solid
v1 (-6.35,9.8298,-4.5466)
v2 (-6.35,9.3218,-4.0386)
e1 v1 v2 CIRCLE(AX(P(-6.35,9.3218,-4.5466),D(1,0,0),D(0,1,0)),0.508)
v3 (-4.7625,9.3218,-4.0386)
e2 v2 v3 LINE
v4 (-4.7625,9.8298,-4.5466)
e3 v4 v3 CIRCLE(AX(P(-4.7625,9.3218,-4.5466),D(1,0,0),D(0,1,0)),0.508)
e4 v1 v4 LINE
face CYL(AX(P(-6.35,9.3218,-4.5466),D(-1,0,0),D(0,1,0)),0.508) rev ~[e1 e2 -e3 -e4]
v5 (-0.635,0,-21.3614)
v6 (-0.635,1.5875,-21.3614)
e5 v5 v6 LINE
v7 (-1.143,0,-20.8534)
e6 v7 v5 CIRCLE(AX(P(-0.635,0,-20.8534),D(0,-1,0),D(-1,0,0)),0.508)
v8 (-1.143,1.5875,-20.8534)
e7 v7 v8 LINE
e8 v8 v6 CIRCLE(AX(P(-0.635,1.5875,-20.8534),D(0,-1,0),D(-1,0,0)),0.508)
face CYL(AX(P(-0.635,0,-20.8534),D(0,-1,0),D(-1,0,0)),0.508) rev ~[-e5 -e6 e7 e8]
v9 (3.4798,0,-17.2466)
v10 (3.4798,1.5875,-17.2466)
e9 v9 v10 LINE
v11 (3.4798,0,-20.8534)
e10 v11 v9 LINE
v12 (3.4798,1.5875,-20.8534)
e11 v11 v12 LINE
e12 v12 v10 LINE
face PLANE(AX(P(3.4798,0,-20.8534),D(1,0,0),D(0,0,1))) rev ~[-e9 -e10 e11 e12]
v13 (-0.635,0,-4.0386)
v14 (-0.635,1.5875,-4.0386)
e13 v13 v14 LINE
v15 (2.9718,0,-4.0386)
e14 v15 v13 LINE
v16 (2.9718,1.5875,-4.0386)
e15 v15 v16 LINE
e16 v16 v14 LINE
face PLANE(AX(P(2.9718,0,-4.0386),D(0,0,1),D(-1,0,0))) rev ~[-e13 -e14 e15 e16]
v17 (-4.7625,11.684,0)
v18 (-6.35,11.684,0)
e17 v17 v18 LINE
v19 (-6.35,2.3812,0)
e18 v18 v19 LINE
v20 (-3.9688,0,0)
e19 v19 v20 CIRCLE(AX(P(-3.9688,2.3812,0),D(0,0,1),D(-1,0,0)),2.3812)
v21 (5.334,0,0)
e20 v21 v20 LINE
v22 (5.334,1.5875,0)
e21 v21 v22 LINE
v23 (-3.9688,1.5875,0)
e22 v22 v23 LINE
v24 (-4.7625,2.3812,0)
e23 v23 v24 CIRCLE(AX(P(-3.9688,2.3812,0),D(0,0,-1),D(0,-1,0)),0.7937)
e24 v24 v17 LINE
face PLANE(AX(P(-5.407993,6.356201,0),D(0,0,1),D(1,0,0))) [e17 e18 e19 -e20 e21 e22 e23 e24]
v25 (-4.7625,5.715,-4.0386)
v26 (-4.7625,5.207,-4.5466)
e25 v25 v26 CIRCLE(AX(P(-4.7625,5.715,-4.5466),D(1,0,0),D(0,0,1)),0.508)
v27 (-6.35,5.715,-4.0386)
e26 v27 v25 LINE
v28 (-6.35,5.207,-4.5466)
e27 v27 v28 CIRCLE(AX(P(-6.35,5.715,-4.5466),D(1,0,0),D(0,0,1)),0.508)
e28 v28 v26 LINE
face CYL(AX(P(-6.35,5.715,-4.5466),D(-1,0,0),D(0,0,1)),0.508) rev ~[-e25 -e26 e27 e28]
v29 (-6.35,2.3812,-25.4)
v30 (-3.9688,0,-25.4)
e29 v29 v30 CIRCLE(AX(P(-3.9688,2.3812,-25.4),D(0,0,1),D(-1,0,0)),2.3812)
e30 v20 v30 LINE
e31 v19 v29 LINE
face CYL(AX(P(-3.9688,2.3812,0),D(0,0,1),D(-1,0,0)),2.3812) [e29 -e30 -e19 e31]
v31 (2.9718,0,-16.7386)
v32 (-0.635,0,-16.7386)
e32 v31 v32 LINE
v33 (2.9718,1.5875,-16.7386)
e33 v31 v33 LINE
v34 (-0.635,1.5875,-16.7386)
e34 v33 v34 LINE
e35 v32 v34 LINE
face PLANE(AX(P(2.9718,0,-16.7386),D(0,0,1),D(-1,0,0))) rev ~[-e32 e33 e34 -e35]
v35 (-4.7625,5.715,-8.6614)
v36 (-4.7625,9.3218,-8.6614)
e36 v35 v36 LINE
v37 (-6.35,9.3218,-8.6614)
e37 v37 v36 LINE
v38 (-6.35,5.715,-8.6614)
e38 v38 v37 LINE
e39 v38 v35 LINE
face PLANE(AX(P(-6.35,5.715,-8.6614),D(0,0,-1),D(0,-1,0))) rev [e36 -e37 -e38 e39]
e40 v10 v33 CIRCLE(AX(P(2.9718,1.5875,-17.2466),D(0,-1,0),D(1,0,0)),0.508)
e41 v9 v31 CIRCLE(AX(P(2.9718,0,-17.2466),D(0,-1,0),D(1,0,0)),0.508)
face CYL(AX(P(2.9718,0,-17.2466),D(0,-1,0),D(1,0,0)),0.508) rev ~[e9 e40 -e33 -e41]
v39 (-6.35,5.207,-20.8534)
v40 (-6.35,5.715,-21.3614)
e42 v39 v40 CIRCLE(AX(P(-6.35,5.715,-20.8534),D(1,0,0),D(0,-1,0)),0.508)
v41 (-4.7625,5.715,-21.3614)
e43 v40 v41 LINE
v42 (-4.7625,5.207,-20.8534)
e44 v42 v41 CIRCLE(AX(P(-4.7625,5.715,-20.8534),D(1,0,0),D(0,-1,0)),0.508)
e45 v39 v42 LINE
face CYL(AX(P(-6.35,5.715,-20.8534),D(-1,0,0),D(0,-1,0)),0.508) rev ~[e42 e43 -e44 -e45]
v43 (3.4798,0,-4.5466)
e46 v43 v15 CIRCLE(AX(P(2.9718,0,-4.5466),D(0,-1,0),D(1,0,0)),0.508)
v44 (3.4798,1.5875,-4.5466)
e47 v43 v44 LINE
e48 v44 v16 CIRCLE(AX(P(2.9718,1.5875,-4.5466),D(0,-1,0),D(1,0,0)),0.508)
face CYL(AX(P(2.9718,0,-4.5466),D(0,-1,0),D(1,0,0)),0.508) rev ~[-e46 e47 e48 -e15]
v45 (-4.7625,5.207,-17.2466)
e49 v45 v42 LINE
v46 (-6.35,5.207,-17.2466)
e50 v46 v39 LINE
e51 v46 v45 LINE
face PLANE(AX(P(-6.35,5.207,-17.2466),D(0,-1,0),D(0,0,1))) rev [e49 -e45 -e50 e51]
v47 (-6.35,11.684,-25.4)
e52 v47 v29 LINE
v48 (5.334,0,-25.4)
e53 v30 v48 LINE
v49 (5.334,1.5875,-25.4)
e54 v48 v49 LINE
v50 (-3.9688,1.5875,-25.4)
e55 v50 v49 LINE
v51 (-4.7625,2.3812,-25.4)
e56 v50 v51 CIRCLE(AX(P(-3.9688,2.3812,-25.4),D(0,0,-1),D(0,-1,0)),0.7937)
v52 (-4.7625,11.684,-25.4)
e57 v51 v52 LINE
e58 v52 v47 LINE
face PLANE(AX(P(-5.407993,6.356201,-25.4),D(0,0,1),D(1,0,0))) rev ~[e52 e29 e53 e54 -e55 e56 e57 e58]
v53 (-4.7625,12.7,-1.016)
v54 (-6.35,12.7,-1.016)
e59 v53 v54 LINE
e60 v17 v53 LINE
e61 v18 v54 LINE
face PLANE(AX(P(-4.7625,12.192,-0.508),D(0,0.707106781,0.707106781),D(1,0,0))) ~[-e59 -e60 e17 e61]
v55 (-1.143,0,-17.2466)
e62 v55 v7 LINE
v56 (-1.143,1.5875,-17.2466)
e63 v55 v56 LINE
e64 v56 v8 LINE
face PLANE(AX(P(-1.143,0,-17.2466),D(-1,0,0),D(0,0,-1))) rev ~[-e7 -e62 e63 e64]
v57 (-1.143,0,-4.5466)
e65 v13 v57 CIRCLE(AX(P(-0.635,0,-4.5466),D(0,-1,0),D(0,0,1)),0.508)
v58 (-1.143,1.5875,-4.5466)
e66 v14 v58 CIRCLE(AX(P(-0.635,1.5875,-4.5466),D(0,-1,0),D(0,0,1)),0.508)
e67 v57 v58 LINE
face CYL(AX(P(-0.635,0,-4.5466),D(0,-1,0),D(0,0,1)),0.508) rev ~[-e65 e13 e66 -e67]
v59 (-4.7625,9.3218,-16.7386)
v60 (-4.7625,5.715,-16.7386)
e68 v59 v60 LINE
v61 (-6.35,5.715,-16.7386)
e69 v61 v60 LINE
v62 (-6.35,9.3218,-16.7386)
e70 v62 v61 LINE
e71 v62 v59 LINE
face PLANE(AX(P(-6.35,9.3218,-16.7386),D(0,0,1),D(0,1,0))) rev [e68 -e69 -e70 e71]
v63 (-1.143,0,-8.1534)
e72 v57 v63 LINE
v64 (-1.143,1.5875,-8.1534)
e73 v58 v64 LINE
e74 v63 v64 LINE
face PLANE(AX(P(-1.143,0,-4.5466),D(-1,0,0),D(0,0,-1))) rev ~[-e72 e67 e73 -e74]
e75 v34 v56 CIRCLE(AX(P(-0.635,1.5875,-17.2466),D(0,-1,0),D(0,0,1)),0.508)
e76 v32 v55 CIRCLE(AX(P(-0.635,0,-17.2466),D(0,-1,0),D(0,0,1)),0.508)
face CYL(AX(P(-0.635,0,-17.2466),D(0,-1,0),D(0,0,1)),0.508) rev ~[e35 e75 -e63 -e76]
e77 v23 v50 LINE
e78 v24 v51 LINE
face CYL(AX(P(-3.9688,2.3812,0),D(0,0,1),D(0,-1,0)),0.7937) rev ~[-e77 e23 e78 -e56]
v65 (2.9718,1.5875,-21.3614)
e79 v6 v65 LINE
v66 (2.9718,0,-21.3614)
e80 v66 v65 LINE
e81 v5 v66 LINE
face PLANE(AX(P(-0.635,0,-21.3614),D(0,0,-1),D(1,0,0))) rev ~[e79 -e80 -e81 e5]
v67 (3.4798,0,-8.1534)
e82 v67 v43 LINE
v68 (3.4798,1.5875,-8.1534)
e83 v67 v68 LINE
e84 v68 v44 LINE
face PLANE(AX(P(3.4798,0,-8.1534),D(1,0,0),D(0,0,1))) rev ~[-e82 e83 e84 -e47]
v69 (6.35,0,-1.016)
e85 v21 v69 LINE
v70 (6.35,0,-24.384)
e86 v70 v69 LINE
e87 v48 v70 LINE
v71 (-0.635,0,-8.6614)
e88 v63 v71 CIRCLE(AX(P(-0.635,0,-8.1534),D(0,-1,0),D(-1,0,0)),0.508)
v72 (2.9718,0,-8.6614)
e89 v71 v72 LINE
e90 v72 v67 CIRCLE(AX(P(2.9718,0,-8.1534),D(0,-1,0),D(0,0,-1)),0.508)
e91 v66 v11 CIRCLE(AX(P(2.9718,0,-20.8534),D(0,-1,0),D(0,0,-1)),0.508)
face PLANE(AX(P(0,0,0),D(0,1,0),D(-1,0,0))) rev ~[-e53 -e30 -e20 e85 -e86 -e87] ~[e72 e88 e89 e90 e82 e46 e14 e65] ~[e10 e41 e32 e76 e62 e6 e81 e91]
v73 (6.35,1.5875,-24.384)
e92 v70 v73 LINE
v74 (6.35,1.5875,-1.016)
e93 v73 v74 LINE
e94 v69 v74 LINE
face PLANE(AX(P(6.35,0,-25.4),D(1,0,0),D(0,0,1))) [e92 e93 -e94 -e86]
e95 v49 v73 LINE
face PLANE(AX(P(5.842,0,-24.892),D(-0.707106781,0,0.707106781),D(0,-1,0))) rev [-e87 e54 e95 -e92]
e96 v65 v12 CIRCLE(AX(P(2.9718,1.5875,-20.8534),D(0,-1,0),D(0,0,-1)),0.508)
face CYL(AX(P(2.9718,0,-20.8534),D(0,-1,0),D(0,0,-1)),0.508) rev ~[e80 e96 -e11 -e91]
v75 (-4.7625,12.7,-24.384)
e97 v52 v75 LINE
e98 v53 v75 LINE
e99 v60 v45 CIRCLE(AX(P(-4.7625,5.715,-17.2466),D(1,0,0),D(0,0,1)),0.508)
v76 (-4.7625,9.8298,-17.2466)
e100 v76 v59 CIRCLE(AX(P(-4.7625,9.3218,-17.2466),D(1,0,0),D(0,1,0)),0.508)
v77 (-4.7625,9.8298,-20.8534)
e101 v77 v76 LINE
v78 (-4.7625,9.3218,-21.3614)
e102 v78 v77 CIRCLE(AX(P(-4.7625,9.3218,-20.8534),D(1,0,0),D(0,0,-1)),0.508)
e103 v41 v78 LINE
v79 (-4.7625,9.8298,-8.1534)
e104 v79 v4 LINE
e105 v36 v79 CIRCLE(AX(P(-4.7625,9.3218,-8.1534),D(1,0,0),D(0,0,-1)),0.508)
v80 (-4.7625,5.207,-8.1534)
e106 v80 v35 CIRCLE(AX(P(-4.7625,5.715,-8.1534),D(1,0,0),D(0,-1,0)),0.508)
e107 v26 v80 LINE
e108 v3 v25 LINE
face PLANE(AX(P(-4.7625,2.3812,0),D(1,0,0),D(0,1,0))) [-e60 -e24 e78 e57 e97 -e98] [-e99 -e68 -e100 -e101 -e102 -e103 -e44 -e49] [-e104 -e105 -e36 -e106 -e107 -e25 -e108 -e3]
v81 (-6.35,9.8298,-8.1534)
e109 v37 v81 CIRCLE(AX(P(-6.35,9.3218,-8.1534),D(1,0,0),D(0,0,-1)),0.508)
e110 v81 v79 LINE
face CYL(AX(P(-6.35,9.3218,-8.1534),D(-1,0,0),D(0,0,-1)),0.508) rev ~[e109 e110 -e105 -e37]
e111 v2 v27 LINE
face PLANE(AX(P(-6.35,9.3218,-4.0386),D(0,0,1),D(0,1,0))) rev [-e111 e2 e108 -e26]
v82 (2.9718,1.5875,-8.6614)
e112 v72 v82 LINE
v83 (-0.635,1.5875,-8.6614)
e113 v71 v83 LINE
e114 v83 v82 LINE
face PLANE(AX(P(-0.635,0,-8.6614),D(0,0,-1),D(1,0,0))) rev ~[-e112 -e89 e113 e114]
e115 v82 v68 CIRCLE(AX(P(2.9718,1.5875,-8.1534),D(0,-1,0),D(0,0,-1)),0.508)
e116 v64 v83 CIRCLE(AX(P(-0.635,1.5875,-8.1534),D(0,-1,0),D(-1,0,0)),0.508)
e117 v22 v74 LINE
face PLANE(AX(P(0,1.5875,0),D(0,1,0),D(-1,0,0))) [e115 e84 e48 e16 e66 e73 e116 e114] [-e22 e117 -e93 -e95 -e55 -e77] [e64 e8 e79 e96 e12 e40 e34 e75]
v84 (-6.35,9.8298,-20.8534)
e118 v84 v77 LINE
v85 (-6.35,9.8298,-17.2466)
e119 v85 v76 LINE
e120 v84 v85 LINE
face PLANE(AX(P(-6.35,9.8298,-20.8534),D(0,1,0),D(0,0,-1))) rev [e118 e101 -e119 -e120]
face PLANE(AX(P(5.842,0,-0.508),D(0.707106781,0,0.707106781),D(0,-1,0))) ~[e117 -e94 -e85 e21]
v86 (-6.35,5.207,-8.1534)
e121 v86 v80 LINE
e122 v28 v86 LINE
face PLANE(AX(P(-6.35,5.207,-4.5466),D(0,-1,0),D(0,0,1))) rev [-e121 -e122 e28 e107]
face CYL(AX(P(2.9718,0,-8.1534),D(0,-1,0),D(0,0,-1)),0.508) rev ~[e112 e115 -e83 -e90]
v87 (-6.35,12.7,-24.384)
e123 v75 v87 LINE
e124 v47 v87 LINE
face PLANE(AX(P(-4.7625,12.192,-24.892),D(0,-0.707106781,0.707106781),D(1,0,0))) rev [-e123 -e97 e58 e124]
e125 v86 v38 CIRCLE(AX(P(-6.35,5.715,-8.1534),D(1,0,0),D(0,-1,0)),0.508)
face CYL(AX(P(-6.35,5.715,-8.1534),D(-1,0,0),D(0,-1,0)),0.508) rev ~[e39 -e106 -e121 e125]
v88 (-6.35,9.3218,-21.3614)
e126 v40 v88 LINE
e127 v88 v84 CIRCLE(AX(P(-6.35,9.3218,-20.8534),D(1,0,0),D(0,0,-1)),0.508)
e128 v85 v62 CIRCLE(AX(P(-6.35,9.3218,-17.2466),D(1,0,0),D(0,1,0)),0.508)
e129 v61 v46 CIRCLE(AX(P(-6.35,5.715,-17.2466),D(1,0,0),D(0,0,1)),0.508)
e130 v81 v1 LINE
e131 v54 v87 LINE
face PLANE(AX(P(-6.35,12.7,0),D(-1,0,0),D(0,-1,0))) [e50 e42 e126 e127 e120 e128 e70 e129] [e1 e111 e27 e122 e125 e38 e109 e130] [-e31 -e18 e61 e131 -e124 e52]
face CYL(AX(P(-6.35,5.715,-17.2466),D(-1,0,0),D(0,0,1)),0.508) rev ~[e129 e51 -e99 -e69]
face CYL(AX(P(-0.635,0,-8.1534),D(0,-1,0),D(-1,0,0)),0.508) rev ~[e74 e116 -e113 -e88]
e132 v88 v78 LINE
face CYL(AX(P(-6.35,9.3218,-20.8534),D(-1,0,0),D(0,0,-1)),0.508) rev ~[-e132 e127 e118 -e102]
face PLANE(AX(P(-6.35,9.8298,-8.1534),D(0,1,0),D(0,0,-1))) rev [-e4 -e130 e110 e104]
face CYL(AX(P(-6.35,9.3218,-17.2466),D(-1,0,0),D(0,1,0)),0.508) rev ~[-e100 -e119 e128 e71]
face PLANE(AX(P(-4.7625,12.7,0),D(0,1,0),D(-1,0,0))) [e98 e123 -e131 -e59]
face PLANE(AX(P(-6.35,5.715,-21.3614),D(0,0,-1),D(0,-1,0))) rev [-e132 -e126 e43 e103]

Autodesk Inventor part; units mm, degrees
ref_plane "YZ Plane" through (0, 0, 0) normal (1, 0, 0) x (0, 1, 0)
ref_plane "XZ Plane" through (0, 0, 0) normal (0, 1, 0) x (-1, 0, 0)
sketch "Sketch1" plane through (0, 0, 0) normal (0, 1, 0) x (-1, 0, 0)
  line L0 (-6.35, 0) -> (6.35, 0)
  line L1 (6.35, 0) -> (6.35, -25.4)
  line L2 (6.35, -25.4) -> (-6.35, -25.4)
  line L3 (-6.35, -25.4) -> (-6.35, 0)
  line L4 (6.35, 0) -> (-6.35, -25.4) construction
  point P0 (0, 0)
  point P1 (0, 0)
  dimension "d0" = 12.7
  dimension "d1" = 25.4
extrude "Plate1" add sketch "Sketch1" along normal blind 1.5875
sketch "Sketch2" plane through (-4.7625, 0, 0) normal (-1, 0, 0) x (0, -1, 0)
  line L0 (0, -25.4) -> (0, 0)
  line L1 (0, 0) -> (-12.7, 0)
  line L2 (-12.7, 0) -> (-12.7, -25.4)
  line L3 (-12.7, -25.4) -> (0, -25.4)
edge flange "Flanges" height 12.7 angle 90 thickness 1.5875 bend radius 0.7937 thickness toward (-1, 0, 0) relief tear relief width 1.5875 relief depth 0.7937 edges at (-6.35, 1.5875, -12.7) wall of the first edge with corners at (-4.7625, 0, -25.4) (-4.7625, 0, 0) (-4.7625, 12.7, 0) (-4.7625, 12.7, -25.4)
bend "Bend1"
corner "Corner1"
sketch "Sketch8" plane through (0, 0, 0) normal (0, -1, 0) x (1, 0, 0)
  line L0 (6.35, 0) -> (-3.9687, 0) construction
  line L1 (2.9718, -4.0386) -> (-0.635, -4.0386)
  line L2 (-1.143, -4.5466) -> (-1.143, -8.1534)
  line L3 (-0.635, -8.6614) -> (2.9718, -8.6614)
  line L4 (3.4798, -8.1534) -> (3.4798, -4.5466)
  arc A0 (3.4798, -4.5466) -> (2.9718, -4.0386) centre (2.9718, -4.5466) ccw
  arc A1 (2.9718, -8.6614) -> (3.4798, -8.1534) centre (2.9718, -8.1534) ccw
  arc A2 (-1.143, -8.1534) -> (-0.635, -8.6614) centre (-0.635, -8.1534) ccw
  arc A3 (-0.635, -4.0386) -> (-1.143, -4.5466) centre (-0.635, -4.5466) ccw
  line L5 (2.9718, -4.5466) -> (-0.635, -8.1534) construction
  line L6 (6.35, -25.4) -> (6.35, 0) construction
  point P0 (0, 0)
  point P1 (-1.143, -8.6614)
  point P2 (3.4798, -8.6614)
  point P3 (12.7, 0)
  point P4 (1.1684, -6.35)
  dimension "d49" = 4.6228
  dimension "d50" = 0.508
  dimension "d52" = 6.35
  dimension "d123" = 5.1816
extrude "Body Stamp" cut sketch "Sketch8" against normal blind 1.5875
sketch "Sketch9" plane through (0, 0, 0) normal (0, -1, 0) x (1, 0, 0)
  arc A0 (3.4798, -4.5466) -> (2.9718, -4.0386) centre (2.9718, -4.5466) ccw construction
  arc A1 (-1.143, -8.1534) -> (-0.635, -8.6614) centre (-0.635, -8.1534) ccw construction
  line L0 (2.9718, -4.5466) -> (-0.635, -8.1534) construction
  circle A2 centre (1.1684, -6.35) radius 2.1844
  point P0 (0, 0)
  dimension "d55" = 4.3688
surface extrude "Body Circle" sketch "Sketch9" against normal up to surface (1.5875 mm away) shown yes curves A2
sketch "Body Pattern Sketch" plane through (0, 0, 0) normal (0, -1, 0) x (1, 0, 0)
  line L0 (1.1684, -6.35) -> (1.1684, 0) construction
  circle A0 centre (1.1684, -6.35) radius 2.1844 construction
  point P0 (1.1684, -19.05)
  dimension "d133" = 12.7
pattern_sketch "Body Pattern" of "Body Stamp", "Body Circle" from (1.1684, 0, -6.35) copies at (1.1684, 0, -19.05)
sketch "Arc Length" plane through (19.05, 2.3812, 0) normal (0, 0, 1) x (1, 0, 0)
  line L0 (-25.4, 0) -> (-23.8125, 0) projected
  arc A0 (-25.4, 0) -> (-23.0187, -2.3813) centre (-23.0187, 0) ccw projected
  line L1 (-23.0187, -0.7938) -> (-23.0187, -2.3813) projected
  arc A1 (-23.8125, 0) -> (-23.0187, -0.7938) centre (-23.0187, 0) ccw projected
  point P0 (-19.05, -2.3812)
  dimension "d126" = 1.2468
  dimension "d127" = 3.7405
feature "Notch" [suppressed]
pattern_linear "Notch Pattern" [suppressed]
ref_plane "Diagonal Plane" through (-4.7625, 1.5875, 0) normal (-0.7071068, 0.7071068, 0) x (0, 0, 1)
mirror "Everything Mirrored" about plane through (-4.7625, 1.5875, 0) normal (-0.7071068, 0.7071068, 0) of "Body Stamp", "Body Circle", "Body Pattern"
chamfer "End Chamfer" distance 1.016 angle 45 4 edges at (-5.5562, 12.7, -25.4) (-5.5562, 12.7, 0) (6.35, 0.7937, 0) (6.35, 0.7937, -25.4)
sketch "Sketch13" plane through (-6.35, 0, 419.1) normal (1, 0, 0) x (0, 0, -1)
  line L0 (480.568, 12.7) -> (482.6, 10.668)
  line L1 (482.6, 10.668) -> (484.632, 12.7)
  line L2 (480.568, 12.7) -> (484.632, 12.7)
  line L3 (482.6, 3.3973) -> (480.3372, 1.1344)
  line L4 (480.3372, 1.1344) -> (482.6, -1.1284)
  line L5 (482.6, -1.1284) -> (484.8628, 1.1344)
  line L6 (484.8628, 1.1344) -> (482.6, 3.3973)
  line L7 (482.6, 3.3973) -> (482.6, -1.1284) construction
  line L8 (482.6, 10.668) -> (482.6, 3.3973) construction
  line L9 (444.5, 12.7) -> (419.1, 12.7) projected
  line L10 (444.5, 2.3813) -> (419.1, 2.3813) construction
  line L11 (419.1, 12.7) -> (419.1, 2.3813) construction
  point P0 (444.5, -11.9062)
  point P1 (419.1, 0)
  dimension "d86" = 4.5256
  dimension "d128" = 2.032
  dimension "d129" = 1.016
  dimension "d130" = 63.5
equation "\"d53\" = Thickness"
equation "\"d89\" = Thickness"
equation "\"d1\" = 12.7 * Length"
equation "\"d2\" = Thickness"
equation "\"d3\" = BendReliefWidth"
equation "\"d4\" = BendReliefDepth"
equation "\"d5\" = MinimumRemnant"
equation "\"d6\" = TransitionRadius"
equation "\"d10\" = CornerReliefSize"
equation "\"d11\" = GapSize"
equation "\"d12\" = JacobiRadiusSize"
equation "\"BendRadius\" = Thickness"
equation "\"BendReliefWidth\" = Thickness"
equation "\"BendReliefDepth\" = 0.5 * Thickness"
equation "\"CornerReliefSize\" = 4 * Thickness"
equation "\"MinimumRemnant\" = 2 * Thickness"
equation "\"TransitionRadius\" = BendRadius"
equation "\"JacobiRadiusSize\" = BendRadius"
equation "\"GapSize\" = Thickness"
equation "\"Thickness\" = 1.5875"
equation "\"Length\" = 2"
properties part number "Alu C 1x2x1x35"
